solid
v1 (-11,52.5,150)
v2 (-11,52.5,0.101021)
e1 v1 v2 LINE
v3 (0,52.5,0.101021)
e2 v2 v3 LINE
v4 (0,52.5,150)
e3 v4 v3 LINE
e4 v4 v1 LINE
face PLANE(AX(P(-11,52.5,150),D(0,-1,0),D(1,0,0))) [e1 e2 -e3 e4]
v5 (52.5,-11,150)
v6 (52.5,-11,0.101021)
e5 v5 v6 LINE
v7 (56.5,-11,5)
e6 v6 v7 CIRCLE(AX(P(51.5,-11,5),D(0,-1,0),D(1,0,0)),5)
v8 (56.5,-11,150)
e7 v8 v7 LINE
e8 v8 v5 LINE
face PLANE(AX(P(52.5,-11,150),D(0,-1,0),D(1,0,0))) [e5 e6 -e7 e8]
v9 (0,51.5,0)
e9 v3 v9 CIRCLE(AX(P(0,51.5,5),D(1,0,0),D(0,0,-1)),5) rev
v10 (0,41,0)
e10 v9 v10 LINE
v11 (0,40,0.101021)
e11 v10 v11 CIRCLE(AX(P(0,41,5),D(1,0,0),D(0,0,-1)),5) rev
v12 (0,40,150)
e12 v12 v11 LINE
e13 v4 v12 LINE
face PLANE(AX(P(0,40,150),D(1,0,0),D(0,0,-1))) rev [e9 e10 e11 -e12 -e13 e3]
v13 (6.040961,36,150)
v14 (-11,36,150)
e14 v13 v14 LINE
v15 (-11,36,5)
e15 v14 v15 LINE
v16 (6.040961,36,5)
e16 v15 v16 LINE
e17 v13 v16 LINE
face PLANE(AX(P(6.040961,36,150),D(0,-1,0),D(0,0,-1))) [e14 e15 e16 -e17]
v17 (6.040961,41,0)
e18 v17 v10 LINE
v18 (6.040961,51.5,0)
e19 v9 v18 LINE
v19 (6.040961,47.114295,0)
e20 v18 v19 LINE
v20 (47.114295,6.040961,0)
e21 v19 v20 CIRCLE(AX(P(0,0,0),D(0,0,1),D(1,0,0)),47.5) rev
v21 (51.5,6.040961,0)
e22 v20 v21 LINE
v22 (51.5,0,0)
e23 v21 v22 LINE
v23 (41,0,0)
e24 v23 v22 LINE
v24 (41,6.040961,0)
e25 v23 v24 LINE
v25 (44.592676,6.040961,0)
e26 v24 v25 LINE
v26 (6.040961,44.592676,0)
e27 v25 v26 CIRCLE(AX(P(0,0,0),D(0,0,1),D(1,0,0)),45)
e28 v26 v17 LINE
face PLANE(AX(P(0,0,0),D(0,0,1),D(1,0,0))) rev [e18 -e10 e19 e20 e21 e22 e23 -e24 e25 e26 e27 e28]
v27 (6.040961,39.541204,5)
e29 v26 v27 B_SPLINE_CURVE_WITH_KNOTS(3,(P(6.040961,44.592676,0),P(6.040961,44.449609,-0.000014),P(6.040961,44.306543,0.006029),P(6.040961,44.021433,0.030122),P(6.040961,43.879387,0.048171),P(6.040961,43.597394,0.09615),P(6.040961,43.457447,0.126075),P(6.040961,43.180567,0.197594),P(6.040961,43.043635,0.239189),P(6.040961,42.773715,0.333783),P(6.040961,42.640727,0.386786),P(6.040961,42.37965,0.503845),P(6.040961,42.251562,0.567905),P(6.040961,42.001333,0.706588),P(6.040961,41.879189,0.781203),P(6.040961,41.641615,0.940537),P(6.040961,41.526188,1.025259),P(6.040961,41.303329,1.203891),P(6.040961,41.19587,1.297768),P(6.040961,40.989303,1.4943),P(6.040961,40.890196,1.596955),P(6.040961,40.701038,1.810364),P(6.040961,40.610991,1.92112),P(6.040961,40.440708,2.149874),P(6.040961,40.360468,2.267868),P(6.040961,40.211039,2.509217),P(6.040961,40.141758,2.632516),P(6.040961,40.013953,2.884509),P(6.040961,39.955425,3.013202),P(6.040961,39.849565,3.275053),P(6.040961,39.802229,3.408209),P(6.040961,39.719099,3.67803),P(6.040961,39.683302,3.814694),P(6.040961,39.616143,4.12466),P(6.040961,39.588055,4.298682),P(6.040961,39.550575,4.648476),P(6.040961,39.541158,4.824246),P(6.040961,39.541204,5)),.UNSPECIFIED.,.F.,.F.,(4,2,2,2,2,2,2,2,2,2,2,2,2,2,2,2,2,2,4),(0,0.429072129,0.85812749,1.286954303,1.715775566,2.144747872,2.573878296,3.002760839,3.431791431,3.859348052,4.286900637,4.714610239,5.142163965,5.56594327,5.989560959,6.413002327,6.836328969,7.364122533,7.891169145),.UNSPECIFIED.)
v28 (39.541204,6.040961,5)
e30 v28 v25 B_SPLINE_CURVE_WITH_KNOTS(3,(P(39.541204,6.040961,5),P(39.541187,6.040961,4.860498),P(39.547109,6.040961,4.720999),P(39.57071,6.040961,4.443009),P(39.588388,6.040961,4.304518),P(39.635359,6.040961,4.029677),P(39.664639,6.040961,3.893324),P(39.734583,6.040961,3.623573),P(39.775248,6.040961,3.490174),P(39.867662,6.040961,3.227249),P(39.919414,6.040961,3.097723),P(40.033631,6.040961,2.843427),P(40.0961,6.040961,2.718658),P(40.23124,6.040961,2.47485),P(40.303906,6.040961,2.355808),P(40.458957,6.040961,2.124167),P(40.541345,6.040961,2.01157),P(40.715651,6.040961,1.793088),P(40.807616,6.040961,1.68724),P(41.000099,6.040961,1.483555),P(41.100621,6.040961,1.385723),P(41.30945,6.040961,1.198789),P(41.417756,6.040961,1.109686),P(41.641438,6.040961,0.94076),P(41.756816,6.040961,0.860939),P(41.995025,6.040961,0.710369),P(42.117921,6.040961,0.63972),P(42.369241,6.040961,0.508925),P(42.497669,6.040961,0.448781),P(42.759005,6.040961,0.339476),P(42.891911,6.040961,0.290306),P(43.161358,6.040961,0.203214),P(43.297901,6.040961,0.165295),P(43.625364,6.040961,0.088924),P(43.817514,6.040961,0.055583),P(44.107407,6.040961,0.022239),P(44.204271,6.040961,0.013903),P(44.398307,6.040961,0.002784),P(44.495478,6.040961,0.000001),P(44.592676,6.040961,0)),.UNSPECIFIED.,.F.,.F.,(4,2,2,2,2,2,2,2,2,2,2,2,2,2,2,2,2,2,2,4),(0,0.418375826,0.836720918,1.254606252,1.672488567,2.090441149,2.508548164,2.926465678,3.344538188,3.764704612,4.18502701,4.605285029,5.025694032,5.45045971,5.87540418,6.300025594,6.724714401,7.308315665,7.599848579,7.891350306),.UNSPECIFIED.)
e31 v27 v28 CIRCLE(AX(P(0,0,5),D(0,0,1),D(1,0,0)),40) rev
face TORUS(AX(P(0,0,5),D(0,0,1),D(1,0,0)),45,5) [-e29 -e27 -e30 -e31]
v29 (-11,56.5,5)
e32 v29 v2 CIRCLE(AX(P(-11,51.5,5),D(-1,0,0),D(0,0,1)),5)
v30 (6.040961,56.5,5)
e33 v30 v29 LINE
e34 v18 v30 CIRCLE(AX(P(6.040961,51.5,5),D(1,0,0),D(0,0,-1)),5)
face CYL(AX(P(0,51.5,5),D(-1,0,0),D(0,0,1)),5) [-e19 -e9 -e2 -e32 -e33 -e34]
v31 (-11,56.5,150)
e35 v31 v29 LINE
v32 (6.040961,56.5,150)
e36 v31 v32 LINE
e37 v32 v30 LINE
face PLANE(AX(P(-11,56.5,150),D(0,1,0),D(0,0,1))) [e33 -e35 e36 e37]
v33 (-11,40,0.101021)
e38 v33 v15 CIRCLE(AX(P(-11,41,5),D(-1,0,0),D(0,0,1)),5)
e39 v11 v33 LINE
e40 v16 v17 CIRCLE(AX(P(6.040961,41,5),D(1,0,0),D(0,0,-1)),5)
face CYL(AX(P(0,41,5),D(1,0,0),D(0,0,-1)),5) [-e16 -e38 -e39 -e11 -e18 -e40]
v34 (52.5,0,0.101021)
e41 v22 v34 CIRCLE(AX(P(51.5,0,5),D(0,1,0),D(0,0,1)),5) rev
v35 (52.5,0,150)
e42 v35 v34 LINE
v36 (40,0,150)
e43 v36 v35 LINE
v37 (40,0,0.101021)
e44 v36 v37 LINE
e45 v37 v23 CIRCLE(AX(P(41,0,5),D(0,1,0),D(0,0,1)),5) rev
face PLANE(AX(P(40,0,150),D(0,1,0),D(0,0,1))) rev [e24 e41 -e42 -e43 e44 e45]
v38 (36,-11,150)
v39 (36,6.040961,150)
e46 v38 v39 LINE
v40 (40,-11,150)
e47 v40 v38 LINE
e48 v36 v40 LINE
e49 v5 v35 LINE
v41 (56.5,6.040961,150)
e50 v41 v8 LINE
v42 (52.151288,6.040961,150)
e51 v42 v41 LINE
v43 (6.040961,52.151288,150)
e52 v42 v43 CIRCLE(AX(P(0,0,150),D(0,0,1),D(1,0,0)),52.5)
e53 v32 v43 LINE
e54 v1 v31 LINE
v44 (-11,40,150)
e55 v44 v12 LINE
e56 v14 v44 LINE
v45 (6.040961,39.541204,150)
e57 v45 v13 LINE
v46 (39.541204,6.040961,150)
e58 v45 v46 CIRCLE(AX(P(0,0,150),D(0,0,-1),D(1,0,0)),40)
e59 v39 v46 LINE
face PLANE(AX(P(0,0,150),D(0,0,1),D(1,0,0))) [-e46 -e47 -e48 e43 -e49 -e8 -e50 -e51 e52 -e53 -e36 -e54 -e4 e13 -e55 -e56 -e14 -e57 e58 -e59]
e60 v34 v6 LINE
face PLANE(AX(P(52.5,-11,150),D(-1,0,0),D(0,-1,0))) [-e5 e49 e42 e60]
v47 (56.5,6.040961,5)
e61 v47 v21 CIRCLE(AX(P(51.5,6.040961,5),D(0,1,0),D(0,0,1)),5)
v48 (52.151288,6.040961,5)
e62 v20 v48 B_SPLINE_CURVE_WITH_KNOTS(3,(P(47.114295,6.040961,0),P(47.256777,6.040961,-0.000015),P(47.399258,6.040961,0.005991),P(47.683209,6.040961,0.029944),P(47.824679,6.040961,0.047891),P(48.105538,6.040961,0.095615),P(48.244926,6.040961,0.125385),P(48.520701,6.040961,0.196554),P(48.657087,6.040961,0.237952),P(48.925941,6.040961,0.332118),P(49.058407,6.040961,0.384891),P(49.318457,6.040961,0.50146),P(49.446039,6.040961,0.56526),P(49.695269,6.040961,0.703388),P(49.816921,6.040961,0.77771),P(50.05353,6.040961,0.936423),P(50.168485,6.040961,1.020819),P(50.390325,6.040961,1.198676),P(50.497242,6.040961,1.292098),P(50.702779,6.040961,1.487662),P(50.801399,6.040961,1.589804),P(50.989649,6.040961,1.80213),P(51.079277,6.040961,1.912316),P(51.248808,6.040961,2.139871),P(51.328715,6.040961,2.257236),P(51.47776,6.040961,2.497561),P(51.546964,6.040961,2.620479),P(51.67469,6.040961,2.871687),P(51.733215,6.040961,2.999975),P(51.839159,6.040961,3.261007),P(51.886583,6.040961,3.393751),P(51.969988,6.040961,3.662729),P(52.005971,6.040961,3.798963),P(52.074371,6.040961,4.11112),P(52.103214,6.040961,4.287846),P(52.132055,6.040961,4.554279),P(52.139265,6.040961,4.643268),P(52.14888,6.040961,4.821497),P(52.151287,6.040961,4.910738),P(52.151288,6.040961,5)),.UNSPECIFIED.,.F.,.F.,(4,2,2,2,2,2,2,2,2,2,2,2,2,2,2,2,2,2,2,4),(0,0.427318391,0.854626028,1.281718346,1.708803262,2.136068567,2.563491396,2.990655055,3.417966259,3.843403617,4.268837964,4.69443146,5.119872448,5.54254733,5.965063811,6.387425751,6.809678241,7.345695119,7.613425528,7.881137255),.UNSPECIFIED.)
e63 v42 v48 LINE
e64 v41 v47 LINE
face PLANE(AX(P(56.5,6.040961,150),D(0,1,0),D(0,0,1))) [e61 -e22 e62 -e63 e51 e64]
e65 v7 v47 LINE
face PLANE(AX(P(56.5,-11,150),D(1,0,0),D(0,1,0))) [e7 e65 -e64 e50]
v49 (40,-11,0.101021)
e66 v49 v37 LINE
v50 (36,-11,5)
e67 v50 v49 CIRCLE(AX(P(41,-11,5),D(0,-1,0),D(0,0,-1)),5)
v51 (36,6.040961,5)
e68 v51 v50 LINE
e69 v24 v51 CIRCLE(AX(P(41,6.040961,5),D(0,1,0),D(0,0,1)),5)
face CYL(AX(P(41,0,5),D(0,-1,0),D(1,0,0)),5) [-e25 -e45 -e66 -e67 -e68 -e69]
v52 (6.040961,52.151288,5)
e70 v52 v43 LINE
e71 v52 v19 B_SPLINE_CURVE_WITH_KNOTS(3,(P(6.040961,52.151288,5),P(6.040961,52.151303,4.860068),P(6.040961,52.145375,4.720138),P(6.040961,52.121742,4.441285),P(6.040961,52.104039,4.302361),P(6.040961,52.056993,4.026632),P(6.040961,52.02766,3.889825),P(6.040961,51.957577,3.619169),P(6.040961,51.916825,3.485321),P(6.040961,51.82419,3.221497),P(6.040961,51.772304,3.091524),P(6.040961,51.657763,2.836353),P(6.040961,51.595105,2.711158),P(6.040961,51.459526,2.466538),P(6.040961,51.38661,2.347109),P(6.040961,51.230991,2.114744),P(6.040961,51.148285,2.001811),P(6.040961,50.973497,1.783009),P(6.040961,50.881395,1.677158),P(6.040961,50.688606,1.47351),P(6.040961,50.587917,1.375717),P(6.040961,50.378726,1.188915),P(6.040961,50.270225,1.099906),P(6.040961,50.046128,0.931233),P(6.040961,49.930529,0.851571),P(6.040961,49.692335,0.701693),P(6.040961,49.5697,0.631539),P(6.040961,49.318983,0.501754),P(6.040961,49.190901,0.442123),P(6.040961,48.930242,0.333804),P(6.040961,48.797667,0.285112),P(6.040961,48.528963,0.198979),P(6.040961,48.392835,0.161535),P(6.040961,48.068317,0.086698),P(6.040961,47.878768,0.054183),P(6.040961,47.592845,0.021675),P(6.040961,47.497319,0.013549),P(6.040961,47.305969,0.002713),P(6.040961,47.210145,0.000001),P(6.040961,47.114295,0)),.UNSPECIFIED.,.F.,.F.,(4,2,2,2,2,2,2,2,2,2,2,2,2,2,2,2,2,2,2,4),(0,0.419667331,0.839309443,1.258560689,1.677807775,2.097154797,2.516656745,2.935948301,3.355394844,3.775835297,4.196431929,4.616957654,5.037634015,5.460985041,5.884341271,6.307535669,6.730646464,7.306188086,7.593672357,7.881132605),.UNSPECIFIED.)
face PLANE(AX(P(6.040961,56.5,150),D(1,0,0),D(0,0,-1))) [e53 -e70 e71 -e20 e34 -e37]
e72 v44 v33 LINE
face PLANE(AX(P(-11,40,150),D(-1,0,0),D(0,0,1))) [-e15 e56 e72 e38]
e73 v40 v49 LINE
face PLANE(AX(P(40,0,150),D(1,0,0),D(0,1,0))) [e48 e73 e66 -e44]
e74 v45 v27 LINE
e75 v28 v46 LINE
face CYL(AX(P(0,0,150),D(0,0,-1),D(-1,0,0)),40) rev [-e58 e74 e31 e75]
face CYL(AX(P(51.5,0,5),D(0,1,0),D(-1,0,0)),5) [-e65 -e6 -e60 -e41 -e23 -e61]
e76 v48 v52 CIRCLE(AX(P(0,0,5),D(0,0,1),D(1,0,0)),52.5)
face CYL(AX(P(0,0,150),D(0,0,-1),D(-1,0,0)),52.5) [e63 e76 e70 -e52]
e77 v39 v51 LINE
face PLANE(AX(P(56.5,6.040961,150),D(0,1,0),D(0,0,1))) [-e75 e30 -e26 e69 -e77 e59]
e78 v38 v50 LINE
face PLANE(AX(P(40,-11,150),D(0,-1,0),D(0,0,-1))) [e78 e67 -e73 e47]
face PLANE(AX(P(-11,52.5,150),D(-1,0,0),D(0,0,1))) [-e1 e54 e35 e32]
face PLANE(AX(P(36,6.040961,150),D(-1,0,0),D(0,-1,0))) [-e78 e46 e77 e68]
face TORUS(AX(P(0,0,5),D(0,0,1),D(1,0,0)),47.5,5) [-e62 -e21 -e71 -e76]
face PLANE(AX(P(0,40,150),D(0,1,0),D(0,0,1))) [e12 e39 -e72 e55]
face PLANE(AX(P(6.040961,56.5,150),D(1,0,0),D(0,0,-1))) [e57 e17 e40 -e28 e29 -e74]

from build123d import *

# Parameters (mm, degrees)
EXTRUDE_1_DEPTH = 150
EXTRUDE_2_DEPTH = 150
FILLET_1_R      = 5
FILLET_2_R      = 5
FILLET_3_R      = 5
FILLET_4_R      = 5
FILLET_5_R      = 5


with BuildPart() as part:
    # 草图1 → 凸台-拉伸1 (new body)
    with BuildSketch(Plane.XY):
        with BuildLine():
            Line((0, 40), (0, 52.5))
            ThreePointArc((0, 52.5), (37.123106012, 37.123106012), (52.5, 0))
            Line((52.5, 0), (40, 0))
            ThreePointArc((40, 0), (28.284271247, 28.284271247), (0, 40))
        make_face()
    extrude(amount=EXTRUDE_1_DEPTH)

    # 草图2 → 凸台-拉伸2 (add)
    with BuildSketch(Plane(origin=(0, 0, 0), x_dir=(-1, 0, 0), z_dir=(0, 0, -1))):
        Polygon((11, 52.5), (11, 56.5), (-6.040960951, 56.5), (-6.040960951, 36), (11, 36), (11, 40), (0, 40), (0, 52.5), align=None)
        Polygon((-52.5, -11), (-52.5, 0), (-40, 0), (-40, -11), (-36, -11), (-36, 6.040960951), (-56.5, 6.040960951), (-56.5, -11), align=None)
    extrude(amount=-EXTRUDE_2_DEPTH)

    # 圆角1
    fillet_1_edges = [part.edges().sort_by_distance(p)[0] for p in [
        (37.123106012, 37.123106012, 0),
    ]]
    fillet(fillet_1_edges, radius=FILLET_1_R)

    # 圆角2
    # the kernel refuses this fillet: 5 mm, written as the material it takes off along each edge
    with BuildSketch(Plane(origin=(0, 0, 0), x_dir=(0.9870710552033948, -0.1602832866510314, 0), z_dir=(-0.1602832866510314, -0.9870710552033948, 0))) as fillet_2_piece_1_section:
        with BuildLine():
            CenterArc((40 + FILLET_2_R, FILLET_2_R), FILLET_2_R, 180, 90)
            Line((40, FILLET_2_R), (40, 0))
            Line((40, 0), (40 + FILLET_2_R, 0))
        make_face()
    fillet_2_piece_1 = revolve(axis=Axis((0, 0, 0), (0, 0, 1)), revolution_arc=108.446679136, mode=Mode.PRIVATE)
    fillet_2_piece_1 = split(fillet_2_piece_1, bisect_by=Plane(origin=(6.040960951, 29.285093623, 1.415376577), z_dir=(1, 0, 0)), keep=Keep.TOP, mode=Mode.PRIVATE)
    fillet_2_piece_1 = split(fillet_2_piece_1, bisect_by=Plane(origin=(29.285093623, 6.040960951, 1.415376577), z_dir=(0, 1, 0)), keep=Keep.TOP, mode=Mode.PRIVATE)
    add(fillet_2_piece_1, mode=Mode.SUBTRACT)

    # 圆角3
    fillet_3_edges = [part.edges().sort_by_distance(p)[0] for p in [
        (-2.479519525, 56.5, 0),
    ]]
    fillet(fillet_3_edges, radius=FILLET_3_R)

    # 圆角4
    fillet_4_edges = [part.edges().sort_by_distance(p)[0] for p in [
        (56.5, -2.479519525, 0),
        (-2.479519525, 36, 0),
    ]]
    fillet(fillet_4_edges, radius=FILLET_4_R)

    # 圆角5
    fillet_5_edges = [part.edges().sort_by_distance(p)[0] for p in [
        (36, -2.479519525, 0),
    ]]
    fillet(fillet_5_edges, radius=FILLET_5_R)


solid = part.part
